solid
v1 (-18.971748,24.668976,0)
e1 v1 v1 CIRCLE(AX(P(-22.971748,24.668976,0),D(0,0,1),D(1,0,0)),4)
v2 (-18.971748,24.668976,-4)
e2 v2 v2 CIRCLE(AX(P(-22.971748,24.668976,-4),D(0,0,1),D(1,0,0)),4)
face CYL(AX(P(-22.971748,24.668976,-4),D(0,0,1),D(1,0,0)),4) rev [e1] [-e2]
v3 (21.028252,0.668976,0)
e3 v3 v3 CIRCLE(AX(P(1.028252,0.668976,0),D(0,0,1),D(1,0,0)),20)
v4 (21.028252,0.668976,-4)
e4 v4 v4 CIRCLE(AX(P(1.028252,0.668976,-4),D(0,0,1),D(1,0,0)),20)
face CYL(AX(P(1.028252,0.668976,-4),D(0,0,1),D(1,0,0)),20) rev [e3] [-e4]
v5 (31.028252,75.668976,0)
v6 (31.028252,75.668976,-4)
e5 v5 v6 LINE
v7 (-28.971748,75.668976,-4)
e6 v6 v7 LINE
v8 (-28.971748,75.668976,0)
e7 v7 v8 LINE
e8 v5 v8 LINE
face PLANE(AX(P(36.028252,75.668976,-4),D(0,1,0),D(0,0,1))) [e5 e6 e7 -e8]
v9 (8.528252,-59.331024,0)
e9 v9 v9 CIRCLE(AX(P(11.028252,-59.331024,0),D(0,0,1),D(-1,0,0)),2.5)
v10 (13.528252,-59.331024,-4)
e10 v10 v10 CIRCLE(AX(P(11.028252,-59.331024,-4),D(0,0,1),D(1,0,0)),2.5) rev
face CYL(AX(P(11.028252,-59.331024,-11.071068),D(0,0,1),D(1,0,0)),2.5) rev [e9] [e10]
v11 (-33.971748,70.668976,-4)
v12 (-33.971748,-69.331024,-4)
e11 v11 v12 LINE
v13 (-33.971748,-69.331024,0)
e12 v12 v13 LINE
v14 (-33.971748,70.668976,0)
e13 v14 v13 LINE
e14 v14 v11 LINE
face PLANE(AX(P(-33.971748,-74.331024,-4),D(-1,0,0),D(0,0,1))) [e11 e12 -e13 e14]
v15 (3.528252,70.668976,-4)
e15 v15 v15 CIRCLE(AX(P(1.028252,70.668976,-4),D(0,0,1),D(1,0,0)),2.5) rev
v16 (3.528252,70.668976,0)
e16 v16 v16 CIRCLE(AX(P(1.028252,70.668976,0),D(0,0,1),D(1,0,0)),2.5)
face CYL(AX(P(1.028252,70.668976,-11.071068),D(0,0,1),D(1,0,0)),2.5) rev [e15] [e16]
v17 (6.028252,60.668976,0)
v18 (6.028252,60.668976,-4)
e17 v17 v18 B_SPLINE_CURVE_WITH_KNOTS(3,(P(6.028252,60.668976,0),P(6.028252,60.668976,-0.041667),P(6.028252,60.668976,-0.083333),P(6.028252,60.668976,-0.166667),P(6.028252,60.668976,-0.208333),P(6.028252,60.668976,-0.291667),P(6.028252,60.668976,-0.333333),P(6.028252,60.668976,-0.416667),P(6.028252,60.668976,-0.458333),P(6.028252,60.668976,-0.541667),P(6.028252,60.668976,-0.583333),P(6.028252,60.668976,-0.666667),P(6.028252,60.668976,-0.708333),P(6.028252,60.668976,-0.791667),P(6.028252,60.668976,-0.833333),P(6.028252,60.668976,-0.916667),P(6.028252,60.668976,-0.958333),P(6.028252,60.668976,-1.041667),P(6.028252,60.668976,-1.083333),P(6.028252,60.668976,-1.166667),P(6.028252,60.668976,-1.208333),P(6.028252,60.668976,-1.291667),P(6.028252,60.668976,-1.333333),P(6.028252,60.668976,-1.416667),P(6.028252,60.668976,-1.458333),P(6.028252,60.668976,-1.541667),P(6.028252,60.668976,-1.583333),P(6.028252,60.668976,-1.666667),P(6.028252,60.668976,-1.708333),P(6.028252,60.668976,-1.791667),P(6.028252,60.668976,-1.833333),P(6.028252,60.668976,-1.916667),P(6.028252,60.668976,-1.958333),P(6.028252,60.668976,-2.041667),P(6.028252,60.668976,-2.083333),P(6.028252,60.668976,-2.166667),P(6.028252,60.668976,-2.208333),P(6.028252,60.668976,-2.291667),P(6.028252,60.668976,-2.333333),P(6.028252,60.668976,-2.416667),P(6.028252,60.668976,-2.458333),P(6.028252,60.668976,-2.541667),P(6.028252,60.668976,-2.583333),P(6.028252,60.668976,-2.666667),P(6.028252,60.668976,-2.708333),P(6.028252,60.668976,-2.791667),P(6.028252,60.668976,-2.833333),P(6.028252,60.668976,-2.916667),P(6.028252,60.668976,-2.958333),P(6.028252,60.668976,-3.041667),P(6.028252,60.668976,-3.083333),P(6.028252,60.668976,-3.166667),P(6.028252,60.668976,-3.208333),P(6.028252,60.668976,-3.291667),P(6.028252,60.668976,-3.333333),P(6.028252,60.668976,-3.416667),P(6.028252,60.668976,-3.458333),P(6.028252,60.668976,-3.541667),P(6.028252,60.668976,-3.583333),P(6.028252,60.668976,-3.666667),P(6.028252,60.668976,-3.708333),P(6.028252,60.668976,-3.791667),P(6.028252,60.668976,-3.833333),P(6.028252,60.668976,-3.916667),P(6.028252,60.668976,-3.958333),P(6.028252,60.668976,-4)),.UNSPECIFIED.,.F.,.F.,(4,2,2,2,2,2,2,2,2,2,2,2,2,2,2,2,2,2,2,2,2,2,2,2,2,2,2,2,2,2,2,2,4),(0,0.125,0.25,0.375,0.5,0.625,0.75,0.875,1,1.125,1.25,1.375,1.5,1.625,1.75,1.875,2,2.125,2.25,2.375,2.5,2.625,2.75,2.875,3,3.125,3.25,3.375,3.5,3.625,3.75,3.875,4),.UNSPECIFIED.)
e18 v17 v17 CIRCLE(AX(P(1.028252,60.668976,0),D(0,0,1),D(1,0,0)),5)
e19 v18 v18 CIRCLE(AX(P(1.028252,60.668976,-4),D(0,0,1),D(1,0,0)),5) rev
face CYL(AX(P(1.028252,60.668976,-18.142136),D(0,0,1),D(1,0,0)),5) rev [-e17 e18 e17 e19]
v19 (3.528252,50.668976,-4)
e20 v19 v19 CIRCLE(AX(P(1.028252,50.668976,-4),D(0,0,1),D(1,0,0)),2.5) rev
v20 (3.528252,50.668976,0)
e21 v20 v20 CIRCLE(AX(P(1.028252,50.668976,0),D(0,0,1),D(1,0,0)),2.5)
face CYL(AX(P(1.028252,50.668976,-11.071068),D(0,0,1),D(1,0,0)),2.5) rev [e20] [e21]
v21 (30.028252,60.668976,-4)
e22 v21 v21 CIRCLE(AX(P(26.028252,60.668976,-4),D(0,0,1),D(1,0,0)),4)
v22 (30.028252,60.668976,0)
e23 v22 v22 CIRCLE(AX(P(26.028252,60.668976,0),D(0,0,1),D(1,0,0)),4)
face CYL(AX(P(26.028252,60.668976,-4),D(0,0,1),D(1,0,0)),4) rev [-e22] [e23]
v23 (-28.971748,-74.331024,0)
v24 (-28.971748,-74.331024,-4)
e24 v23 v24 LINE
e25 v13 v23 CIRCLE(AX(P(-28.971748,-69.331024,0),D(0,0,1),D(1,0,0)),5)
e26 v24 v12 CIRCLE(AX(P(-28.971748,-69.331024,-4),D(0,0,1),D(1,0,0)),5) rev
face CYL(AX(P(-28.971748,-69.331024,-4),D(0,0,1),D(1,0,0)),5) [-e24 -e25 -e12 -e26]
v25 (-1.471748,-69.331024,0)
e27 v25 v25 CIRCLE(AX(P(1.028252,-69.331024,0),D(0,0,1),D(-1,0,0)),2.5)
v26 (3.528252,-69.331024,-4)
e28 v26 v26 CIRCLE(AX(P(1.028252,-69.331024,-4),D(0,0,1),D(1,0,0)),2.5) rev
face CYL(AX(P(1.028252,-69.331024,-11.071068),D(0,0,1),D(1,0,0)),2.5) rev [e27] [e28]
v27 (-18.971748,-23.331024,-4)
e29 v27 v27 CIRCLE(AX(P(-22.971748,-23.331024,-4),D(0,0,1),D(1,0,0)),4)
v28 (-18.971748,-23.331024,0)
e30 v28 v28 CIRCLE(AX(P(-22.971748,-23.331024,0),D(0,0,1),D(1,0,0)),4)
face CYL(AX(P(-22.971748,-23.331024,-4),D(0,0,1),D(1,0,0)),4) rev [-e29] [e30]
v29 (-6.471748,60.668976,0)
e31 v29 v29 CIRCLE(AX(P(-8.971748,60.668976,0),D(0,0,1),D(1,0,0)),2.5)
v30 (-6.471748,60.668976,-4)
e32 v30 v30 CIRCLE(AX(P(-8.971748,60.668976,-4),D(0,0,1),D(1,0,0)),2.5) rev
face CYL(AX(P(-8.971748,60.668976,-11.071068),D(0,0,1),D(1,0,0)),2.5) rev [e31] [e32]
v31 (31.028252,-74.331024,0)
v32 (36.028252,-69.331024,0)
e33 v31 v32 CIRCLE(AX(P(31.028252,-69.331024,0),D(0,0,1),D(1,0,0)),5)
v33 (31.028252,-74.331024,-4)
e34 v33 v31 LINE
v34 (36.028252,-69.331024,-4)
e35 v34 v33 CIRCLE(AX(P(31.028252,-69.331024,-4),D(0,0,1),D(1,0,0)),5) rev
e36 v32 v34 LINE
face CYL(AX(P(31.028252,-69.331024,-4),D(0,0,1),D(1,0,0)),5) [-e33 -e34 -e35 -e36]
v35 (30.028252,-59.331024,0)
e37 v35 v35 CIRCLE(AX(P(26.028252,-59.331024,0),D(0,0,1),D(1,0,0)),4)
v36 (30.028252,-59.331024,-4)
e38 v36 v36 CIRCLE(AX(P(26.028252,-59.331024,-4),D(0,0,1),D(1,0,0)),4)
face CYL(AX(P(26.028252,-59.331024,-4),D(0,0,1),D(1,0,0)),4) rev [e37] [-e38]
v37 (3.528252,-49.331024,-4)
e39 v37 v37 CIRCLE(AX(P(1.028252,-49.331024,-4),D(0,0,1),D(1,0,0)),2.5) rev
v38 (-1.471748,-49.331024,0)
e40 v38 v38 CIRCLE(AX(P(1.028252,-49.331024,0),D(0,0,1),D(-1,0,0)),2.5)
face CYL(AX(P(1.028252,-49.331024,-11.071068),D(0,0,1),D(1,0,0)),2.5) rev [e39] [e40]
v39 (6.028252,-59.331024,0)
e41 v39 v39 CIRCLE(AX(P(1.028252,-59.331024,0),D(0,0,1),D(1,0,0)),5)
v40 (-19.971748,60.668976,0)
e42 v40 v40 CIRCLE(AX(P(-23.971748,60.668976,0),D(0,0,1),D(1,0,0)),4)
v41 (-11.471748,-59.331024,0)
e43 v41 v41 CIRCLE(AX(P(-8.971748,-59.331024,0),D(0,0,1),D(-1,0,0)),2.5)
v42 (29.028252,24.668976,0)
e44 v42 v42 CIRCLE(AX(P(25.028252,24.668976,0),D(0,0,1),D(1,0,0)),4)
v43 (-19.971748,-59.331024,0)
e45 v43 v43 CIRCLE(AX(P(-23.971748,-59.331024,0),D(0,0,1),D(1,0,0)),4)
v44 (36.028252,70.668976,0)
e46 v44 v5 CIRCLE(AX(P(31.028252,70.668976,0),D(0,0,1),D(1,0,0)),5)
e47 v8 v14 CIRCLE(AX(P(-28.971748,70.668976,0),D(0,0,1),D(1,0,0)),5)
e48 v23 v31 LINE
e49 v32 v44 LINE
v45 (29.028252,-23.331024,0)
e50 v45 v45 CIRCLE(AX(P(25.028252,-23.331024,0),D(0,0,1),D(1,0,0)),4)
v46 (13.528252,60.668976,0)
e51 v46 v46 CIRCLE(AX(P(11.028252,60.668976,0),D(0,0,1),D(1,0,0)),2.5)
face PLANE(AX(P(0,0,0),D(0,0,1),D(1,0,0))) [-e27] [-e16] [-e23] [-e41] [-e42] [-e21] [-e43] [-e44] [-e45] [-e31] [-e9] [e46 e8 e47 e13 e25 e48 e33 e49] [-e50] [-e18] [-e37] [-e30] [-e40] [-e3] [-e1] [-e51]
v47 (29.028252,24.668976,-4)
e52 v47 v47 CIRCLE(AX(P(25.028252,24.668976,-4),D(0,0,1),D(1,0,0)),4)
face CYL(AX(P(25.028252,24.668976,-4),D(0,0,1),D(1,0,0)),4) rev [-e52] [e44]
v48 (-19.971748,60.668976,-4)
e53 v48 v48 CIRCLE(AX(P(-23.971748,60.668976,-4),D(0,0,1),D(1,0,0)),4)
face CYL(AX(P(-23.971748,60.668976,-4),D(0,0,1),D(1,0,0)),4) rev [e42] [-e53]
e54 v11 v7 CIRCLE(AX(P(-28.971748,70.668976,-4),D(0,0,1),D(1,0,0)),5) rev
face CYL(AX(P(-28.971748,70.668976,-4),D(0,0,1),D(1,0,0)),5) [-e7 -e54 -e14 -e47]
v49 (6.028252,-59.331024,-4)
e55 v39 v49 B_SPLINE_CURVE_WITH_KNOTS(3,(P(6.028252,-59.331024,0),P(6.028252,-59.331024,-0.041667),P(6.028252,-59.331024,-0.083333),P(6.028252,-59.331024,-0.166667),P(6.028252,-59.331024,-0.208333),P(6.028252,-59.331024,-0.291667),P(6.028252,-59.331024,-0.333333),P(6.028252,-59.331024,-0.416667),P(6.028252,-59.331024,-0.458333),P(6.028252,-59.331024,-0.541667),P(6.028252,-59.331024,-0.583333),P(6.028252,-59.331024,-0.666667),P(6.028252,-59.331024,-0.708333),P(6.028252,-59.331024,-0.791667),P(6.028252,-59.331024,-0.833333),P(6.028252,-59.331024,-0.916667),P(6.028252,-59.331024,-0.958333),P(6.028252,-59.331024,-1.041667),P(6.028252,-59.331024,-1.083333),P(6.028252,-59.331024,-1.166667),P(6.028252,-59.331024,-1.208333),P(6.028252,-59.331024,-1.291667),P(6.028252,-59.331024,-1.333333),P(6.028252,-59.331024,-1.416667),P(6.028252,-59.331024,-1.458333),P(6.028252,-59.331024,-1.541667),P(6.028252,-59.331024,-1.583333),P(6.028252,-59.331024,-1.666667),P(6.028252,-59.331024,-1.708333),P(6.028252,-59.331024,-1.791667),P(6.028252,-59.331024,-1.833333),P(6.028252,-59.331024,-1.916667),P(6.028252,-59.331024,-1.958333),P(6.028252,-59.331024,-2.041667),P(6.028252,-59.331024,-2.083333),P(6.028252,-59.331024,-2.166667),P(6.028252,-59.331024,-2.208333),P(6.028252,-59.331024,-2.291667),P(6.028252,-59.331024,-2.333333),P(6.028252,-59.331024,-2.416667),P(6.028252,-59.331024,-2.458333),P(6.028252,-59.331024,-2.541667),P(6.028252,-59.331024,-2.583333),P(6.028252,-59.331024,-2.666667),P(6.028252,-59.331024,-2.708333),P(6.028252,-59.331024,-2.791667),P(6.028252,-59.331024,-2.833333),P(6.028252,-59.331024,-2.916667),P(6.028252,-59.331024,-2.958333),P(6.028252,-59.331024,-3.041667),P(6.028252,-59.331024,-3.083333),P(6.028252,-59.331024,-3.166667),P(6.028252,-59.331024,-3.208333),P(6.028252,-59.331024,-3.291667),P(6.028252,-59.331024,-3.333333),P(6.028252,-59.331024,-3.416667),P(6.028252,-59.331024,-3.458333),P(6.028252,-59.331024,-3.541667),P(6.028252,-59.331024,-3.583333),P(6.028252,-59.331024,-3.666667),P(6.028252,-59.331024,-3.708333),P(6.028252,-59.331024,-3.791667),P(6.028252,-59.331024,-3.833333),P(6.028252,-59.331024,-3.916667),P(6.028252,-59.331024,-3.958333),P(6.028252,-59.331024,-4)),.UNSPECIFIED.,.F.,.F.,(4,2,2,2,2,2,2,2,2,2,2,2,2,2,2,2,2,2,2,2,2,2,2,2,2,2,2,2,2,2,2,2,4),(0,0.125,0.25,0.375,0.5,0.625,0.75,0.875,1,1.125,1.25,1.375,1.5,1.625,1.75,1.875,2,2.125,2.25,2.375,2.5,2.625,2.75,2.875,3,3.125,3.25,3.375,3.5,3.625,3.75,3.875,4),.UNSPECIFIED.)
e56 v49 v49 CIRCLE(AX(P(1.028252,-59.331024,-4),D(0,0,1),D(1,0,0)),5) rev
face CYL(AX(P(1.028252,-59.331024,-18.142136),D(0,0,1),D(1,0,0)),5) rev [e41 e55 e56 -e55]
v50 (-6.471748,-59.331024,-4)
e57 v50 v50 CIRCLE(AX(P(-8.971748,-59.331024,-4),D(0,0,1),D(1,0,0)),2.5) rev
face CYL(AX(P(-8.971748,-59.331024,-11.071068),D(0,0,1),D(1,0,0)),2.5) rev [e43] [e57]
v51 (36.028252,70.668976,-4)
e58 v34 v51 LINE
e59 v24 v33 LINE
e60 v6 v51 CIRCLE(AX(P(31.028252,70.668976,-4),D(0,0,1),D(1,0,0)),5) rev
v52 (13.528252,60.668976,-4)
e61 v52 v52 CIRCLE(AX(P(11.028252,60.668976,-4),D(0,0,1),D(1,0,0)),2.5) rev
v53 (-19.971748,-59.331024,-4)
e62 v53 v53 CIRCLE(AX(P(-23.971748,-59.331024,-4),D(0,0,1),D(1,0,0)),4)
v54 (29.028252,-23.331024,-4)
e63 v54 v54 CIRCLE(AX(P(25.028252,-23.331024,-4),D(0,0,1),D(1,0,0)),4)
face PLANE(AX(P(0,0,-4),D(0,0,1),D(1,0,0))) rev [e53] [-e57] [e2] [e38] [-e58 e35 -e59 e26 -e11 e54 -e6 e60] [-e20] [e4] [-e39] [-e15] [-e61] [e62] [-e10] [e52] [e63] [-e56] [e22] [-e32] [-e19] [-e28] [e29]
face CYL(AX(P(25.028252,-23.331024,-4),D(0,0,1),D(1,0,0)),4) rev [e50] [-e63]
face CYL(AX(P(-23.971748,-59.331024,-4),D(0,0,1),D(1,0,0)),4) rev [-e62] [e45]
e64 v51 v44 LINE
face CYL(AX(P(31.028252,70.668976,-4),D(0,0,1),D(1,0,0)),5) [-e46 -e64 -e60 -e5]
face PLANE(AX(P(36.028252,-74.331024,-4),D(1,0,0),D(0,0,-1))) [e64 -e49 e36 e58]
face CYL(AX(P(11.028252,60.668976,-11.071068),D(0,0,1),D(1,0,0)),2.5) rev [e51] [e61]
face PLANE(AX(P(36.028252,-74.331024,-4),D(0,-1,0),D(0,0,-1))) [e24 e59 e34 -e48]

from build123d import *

# Parameters (mm, degrees)
SKETCH1_W               = 70
SKETCH1_H               = 150
SKETCH1_R               = 20
SKETCH1_R_2             = 4
BASE_FLANGE1_DEPTH      = 4
FILLET1_R               = 5
CUT_EXTRUDE1_DEPTH      = 84.903688401
CUT_EXTRUDE1_DEPTH_BACK = 4
SKETCH2_R               = 5
SKETCH3_R               = 2.5
CUT_EXTRUDE2_DEPTH      = 4


# Sheet-metal steps are written as plain solids
with BuildPart() as part:
    # Sketch1 → Base-Flange1 (new body)
    with BuildSketch(Plane.XY):
        with Locations((1.028252341, 0.668976209)):
            Rectangle(SKETCH1_W, SKETCH1_H)
        with Locations((1.028252341, 0.668976209)):
            Circle(SKETCH1_R, mode=Mode.SUBTRACT)
        with Locations((-22.971747659, 24.668976209)):
            Circle(SKETCH1_R_2, mode=Mode.SUBTRACT)
        with Locations((25.028252341, 24.668976209)):
            Circle(SKETCH1_R_2, mode=Mode.SUBTRACT)
        with Locations((25.028252341, -23.331023791)):
            Circle(SKETCH1_R_2, mode=Mode.SUBTRACT)
        with Locations((-22.971747659, -23.331023791)):
            Circle(SKETCH1_R_2, mode=Mode.SUBTRACT)
        with Locations((26.028252341, 60.668976209)):
            Circle(SKETCH1_R_2, mode=Mode.SUBTRACT)
        with Locations((-23.971747659, 60.668976209)):
            Circle(SKETCH1_R_2, mode=Mode.SUBTRACT)
        with Locations((26.028252341, -59.331023791)):
            Circle(SKETCH1_R_2, mode=Mode.SUBTRACT)
        with Locations((-23.971747659, -59.331023791)):
            Circle(SKETCH1_R_2, mode=Mode.SUBTRACT)
    extrude(amount=-BASE_FLANGE1_DEPTH)

    # Fillet1
    fillet1_edges = [part.edges().sort_by_distance(p)[0] for p in [
        (-33.971747659, 75.668976209, -2),
        (36.028252341, 75.668976209, -2),
        (36.028252341, -74.331023791, -2),
        (-33.971747659, -74.331023791, -2),
    ]]
    fillet(fillet1_edges, radius=FILLET1_R)

    # Sketch2 → Cut-Extrude1 (cut, two sides: drawn at the far end of the back side and taken through both)
    with BuildSketch(Plane.XY.offset(-CUT_EXTRUDE1_DEPTH_BACK)):
        with Locations((1.028252341, 60.668976209)):
            Circle(SKETCH2_R)
        with Locations((1.028252341, -59.331023791)):
            Circle(SKETCH2_R)
    extrude(amount=CUT_EXTRUDE1_DEPTH + CUT_EXTRUDE1_DEPTH_BACK, mode=Mode.SUBTRACT)

    # Sketch3 → Cut-Extrude2 (cut)
    with BuildSketch(Plane.XY):
        with Locations((1.028252341, 70.668976209)):
            Circle(SKETCH3_R)
        with Locations((11.028252341, 60.668976209)):
            Circle(SKETCH3_R)
        with Locations((1.028252341, 50.668976209)):
            Circle(SKETCH3_R)
        with Locations((-8.971747659, 60.668976209)):
            Circle(SKETCH3_R)
        with Locations((-8.971747659, -59.331023791)):
            Circle(SKETCH3_R)
        with Locations((1.028252341, -49.331023791)):
            Circle(SKETCH3_R)
        with Locations((11.028252341, -59.331023791)):
            Circle(SKETCH3_R)
        with Locations((1.028252341, -69.331023791)):
            Circle(SKETCH3_R)
    extrude(amount=-CUT_EXTRUDE2_DEPTH, mode=Mode.SUBTRACT)


solid = part.part
